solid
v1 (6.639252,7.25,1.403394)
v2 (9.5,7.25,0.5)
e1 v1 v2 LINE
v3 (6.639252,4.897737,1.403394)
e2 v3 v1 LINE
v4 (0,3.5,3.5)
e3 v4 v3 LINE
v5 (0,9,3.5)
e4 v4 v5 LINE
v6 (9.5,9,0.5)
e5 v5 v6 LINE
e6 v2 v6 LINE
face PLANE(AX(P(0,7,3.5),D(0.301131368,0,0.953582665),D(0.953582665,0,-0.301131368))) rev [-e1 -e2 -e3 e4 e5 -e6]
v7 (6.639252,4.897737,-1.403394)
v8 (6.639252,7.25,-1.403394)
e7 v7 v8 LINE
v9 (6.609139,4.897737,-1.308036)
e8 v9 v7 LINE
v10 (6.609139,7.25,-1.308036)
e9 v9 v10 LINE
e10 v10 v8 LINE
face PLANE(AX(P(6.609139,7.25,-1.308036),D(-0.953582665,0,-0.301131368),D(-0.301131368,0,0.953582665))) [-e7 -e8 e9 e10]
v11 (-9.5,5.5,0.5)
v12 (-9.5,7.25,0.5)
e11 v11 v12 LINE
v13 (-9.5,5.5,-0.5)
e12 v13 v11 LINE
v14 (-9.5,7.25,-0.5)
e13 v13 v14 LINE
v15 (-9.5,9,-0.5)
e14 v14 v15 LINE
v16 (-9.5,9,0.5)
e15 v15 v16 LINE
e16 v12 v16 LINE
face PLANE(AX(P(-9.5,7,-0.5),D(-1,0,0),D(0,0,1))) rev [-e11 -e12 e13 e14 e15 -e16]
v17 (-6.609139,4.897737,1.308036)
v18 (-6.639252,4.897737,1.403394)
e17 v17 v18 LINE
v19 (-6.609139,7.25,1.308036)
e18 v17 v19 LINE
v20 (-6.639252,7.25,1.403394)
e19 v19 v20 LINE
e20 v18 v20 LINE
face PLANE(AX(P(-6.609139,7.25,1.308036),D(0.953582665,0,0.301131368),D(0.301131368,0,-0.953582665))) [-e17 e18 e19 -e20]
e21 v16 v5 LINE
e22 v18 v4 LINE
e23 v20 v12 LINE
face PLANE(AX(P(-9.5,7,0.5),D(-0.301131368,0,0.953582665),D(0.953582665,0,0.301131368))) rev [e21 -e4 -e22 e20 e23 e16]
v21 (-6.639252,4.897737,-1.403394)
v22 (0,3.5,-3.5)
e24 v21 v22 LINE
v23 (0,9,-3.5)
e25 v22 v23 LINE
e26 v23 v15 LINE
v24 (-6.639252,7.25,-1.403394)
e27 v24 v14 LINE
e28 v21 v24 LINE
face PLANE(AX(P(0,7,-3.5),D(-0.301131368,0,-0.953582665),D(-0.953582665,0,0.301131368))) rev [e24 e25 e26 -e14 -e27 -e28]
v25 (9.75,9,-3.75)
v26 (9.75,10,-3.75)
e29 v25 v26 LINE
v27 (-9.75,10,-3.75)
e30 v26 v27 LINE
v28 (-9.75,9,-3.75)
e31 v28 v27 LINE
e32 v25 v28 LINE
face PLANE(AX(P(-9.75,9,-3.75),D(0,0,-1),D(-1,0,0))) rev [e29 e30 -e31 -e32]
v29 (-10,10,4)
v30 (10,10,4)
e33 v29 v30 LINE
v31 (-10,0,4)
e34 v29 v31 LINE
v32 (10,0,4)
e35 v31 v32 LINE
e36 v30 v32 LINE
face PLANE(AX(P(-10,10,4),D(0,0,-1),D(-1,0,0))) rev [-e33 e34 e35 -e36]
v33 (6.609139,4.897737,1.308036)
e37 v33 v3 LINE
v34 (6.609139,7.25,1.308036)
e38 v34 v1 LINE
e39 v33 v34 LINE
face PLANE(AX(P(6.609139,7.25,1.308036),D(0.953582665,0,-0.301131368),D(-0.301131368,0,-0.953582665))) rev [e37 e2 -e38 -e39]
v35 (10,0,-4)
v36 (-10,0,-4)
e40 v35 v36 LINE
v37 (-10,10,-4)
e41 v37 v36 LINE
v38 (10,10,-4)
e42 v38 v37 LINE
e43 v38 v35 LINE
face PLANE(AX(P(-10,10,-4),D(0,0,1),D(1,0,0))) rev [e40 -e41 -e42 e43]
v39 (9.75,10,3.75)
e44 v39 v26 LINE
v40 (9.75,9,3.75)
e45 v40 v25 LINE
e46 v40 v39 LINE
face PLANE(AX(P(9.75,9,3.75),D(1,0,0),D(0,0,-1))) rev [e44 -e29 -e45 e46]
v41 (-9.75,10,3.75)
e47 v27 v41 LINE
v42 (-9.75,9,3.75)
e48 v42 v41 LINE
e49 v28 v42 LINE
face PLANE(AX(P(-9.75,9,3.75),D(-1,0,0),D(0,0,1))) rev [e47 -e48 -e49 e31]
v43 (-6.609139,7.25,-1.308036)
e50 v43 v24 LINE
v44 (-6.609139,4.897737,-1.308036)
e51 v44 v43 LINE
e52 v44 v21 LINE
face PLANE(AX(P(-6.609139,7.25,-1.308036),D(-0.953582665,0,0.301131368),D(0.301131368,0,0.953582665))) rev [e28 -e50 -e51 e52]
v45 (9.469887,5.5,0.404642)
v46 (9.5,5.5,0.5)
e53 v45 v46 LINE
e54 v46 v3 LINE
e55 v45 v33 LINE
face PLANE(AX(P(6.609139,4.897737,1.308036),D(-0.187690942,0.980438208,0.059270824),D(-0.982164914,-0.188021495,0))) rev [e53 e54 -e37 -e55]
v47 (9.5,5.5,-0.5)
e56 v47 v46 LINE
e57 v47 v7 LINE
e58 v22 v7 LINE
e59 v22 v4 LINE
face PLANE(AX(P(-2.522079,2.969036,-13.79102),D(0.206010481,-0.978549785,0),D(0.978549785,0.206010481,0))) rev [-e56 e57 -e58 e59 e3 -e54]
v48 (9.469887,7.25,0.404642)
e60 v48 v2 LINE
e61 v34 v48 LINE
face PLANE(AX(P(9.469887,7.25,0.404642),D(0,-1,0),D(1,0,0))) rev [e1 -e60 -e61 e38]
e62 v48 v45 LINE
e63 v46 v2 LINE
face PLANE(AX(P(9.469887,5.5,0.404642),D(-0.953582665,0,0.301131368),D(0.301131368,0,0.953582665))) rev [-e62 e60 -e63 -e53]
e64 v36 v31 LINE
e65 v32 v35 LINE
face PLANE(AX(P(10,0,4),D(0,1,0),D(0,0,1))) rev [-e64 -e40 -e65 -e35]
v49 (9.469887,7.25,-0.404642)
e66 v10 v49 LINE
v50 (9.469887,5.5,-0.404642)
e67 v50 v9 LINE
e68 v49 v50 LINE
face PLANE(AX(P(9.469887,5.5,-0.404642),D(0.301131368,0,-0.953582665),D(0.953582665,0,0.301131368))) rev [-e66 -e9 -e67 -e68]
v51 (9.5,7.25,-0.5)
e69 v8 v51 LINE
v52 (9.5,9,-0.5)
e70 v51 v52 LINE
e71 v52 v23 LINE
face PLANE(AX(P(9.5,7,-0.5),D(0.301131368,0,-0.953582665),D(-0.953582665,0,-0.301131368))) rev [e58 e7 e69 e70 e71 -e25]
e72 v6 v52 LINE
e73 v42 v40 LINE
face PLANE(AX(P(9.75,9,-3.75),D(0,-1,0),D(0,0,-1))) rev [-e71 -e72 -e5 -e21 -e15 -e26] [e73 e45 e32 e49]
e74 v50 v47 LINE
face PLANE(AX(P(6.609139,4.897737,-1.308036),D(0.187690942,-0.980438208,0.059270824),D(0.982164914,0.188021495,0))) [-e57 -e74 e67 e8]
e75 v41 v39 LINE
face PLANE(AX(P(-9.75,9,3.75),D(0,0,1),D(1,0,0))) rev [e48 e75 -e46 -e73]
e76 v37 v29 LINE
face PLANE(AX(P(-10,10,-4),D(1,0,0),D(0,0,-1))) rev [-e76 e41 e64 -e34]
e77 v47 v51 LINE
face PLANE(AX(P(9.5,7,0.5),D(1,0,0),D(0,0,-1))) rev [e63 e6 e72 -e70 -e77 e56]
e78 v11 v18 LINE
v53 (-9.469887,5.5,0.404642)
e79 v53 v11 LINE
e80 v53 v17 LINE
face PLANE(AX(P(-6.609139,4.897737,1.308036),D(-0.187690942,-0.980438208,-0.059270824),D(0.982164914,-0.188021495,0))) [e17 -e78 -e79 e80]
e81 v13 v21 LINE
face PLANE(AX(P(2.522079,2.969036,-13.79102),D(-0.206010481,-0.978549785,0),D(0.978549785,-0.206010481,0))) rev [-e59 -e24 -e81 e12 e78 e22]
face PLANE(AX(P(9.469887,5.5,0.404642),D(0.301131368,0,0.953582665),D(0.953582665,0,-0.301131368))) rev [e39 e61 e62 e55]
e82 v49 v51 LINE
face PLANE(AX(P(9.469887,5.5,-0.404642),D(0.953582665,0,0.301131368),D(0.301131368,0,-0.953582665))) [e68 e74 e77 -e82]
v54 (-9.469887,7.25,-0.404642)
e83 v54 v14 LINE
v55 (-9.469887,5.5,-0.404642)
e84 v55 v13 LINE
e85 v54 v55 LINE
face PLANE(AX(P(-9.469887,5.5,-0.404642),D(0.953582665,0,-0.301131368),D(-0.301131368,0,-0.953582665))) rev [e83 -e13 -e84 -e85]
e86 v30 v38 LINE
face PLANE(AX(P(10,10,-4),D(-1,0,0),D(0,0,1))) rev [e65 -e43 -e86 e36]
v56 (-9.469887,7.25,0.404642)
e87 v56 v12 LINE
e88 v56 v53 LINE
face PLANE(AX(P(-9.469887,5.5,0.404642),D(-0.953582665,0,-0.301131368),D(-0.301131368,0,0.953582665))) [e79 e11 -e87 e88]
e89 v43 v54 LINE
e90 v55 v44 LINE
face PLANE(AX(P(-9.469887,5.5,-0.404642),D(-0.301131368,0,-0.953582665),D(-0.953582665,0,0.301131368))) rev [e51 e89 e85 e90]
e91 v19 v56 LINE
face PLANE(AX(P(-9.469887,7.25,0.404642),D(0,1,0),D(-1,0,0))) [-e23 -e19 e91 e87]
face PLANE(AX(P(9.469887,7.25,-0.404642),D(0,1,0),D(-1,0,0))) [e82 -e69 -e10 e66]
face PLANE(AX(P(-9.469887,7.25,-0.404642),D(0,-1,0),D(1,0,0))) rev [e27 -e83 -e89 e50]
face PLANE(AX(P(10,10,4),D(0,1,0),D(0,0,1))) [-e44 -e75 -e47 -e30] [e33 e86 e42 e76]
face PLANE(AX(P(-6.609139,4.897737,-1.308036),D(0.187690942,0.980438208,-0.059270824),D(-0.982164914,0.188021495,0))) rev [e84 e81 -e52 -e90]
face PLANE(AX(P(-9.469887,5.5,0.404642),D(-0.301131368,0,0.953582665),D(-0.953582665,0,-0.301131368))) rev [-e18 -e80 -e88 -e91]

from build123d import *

# Parameters (mm, degrees)
SKETCH_1_W                      = 20
SKETCH_1_H                      = 8
EXTRUDE_1_DEPTH                 = 10
CUT_EXTRUDE_2_DEPTH             = 3
CUT_EXTRUDE_3_REACH             = 16.697
CUT_EXTRUDE_3_DIRECTION_2_REACH = 16.697
CUT_EXTRUDE_START               = 3.5
CUT_EXTRUDE_4_DEPTH             = 3.5
CUT_EXTRUDE_START_2             = -3.424924247
CUT_EXTRUDE_4_2_DEPTH           = 1.95709957
SKETCH_7_W                      = 19.5
SKETCH_7_H                      = 7.5
CUT_EXTRUDE_5_DEPTH             = 1
EXTRUDE_6_DEPTH                 = 0.1
MIRROR_2_COPY_1_DEPTH           = 0.1


with BuildPart() as part:
    # 草圖1 → 伸長1 (new body)
    with BuildSketch(Plane(origin=(0, 0, 0), x_dir=(1, 0, 0), z_dir=(0, 1, 0))):
        Rectangle(SKETCH_1_W, SKETCH_1_H)
    extrude(amount=EXTRUDE_1_DEPTH)

    # 草圖2 → 伸長2 (cut)
    with BuildSketch(Plane(origin=(0, 10, 0), x_dir=(1, 0, 0), z_dir=(0, 1, 0))):
        Polygon((-9.5, 0.5), (-9.5, -0.5), (0, -3.5), (9.5, -0.5), (9.5, 0.5), (0, 3.5), align=None)
    extrude(amount=-CUT_EXTRUDE_2_DEPTH, mode=Mode.SUBTRACT)

    # 伸長3: up to this plane
    cut_extrude_3_end = Plane(origin=(0, 7, -3.5), z_dir=(-0.3011313679370976, 0, -0.9535826651341416))
    # 草圖4 → 伸長3 (cut, up to the surface)
    with BuildSketch(Plane.XY, mode=Mode.PRIVATE) as cut_extrude_3_sk1:
        Polygon((0, 10), (-9.5, 10), (-9.5, 5.5), (0, 3.5), align=None)
    cut_extrude_3_tool1 = split(extrude(cut_extrude_3_sk1.sketch, amount=-CUT_EXTRUDE_3_REACH, mode=Mode.PRIVATE), bisect_by=cut_extrude_3_end, keep=Keep.BOTH, mode=Mode.PRIVATE)
    add(cut_extrude_3_tool1.solids().sort_by_distance((-4.462121, 7.219697, 0))[0], mode=Mode.SUBTRACT)

    # 伸長3 direction 2: up to this plane
    cut_extrude_3_direction_2_end = Plane(origin=(-9.5, 7, 0.5), z_dir=(-0.3011313679370972, 0, 0.9535826651341417))
    # 草圖4 → 伸長3 direction 2 (cut, up to the surface)
    with BuildSketch(Plane.XY, mode=Mode.PRIVATE) as cut_extrude_3_direction_2_sk1:
        Polygon((0, 10), (-9.5, 10), (-9.5, 5.5), (0, 3.5), align=None)
    cut_extrude_3_direction_2_tool1 = split(extrude(cut_extrude_3_direction_2_sk1.sketch, amount=CUT_EXTRUDE_3_DIRECTION_2_REACH, mode=Mode.PRIVATE), bisect_by=cut_extrude_3_direction_2_end, keep=Keep.BOTH, mode=Mode.PRIVATE)
    add(cut_extrude_3_direction_2_tool1.solids().sort_by_distance((-4.462121, 7.219697, 0))[0], mode=Mode.SUBTRACT)

    # 伸長4: read off the stored shape, not the designer's step
    # 伸長4 outline → 伸長4 (cut)
    with BuildSketch(Plane(origin=(0, 0, 0), x_dir=(1, 0, 0), z_dir=(0, 1, 0)).offset(CUT_EXTRUDE_START)):
        Polygon((9.5, -0.5), (9.5, 0.5), (0, 3.5), (0, -3.5), align=None)
    extrude(amount=CUT_EXTRUDE_4_DEPTH, mode=Mode.SUBTRACT)

    # Cut-Extrude 4 2 outline → Cut-Extrude 4 2 (add)
    with BuildSketch(Plane(origin=(0, 0, 0), x_dir=(0.978549784986749, 0.206010481049842, 0), z_dir=(0.206010481049842, -0.978549784986749, 0)).offset(CUT_EXTRUDE_START_2)):
        Polygon((0.721036684, 3.5), (0.721036684, -3.5), (10.429280603, -0.5), (10.429280603, 0.5), align=None)
    extrude(amount=CUT_EXTRUDE_4_2_DEPTH)

    # 草圖7 → 伸長5 (cut)
    with BuildSketch(Plane(origin=(0, 10, 0), x_dir=(1, 0, 0), z_dir=(0, 1, 0))):
        Rectangle(SKETCH_7_W, SKETCH_7_H)
    extrude(amount=-CUT_EXTRUDE_5_DEPTH, mode=Mode.SUBTRACT)

    # 草圖8 → 伸長6 (add)
    with BuildSketch(Plane(origin=(-1.005037783, 0, -3.182619647), x_dir=(0.9535826651341416, 0, -0.3011313679370976), z_dir=(0.3011313679370976, 0, 0.9535826651341416))):
        Polygon((-8.908469635, 5.5), (-8.908469635, 7.25), (-5.908469635, 7.25), (-5.908469635, 4.897737264), align=None)
    extrude_6 = extrude(amount=EXTRUDE_6_DEPTH)

    # 鏡射1: 伸長6 across plane
    add(extrude_6.mirror(Plane.XY))

    # 鏡射2: 伸長6 across plane
    add(extrude_6.mirror(Plane(origin=(0, 0, 0), x_dir=(0, 0, 1), z_dir=(1, 0, 0))))

    # 鏡射2 copy 1 sketch → 鏡射2 copy 1 (add)
    with BuildSketch(Plane(origin=(1.005037783, 0, 3.182619647), x_dir=(-0.9535826651341415, 0, 0.301131367937098), z_dir=(-0.301131367937098, 0, -0.9535826651341415))):
        Polygon((-8.908469635, 5.5), (-8.908469635, 7.25), (-5.908469635, 7.25), (-5.908469635, 4.897737264), align=None)
    extrude(amount=MIRROR_2_COPY_1_DEPTH)


solid = part.part
